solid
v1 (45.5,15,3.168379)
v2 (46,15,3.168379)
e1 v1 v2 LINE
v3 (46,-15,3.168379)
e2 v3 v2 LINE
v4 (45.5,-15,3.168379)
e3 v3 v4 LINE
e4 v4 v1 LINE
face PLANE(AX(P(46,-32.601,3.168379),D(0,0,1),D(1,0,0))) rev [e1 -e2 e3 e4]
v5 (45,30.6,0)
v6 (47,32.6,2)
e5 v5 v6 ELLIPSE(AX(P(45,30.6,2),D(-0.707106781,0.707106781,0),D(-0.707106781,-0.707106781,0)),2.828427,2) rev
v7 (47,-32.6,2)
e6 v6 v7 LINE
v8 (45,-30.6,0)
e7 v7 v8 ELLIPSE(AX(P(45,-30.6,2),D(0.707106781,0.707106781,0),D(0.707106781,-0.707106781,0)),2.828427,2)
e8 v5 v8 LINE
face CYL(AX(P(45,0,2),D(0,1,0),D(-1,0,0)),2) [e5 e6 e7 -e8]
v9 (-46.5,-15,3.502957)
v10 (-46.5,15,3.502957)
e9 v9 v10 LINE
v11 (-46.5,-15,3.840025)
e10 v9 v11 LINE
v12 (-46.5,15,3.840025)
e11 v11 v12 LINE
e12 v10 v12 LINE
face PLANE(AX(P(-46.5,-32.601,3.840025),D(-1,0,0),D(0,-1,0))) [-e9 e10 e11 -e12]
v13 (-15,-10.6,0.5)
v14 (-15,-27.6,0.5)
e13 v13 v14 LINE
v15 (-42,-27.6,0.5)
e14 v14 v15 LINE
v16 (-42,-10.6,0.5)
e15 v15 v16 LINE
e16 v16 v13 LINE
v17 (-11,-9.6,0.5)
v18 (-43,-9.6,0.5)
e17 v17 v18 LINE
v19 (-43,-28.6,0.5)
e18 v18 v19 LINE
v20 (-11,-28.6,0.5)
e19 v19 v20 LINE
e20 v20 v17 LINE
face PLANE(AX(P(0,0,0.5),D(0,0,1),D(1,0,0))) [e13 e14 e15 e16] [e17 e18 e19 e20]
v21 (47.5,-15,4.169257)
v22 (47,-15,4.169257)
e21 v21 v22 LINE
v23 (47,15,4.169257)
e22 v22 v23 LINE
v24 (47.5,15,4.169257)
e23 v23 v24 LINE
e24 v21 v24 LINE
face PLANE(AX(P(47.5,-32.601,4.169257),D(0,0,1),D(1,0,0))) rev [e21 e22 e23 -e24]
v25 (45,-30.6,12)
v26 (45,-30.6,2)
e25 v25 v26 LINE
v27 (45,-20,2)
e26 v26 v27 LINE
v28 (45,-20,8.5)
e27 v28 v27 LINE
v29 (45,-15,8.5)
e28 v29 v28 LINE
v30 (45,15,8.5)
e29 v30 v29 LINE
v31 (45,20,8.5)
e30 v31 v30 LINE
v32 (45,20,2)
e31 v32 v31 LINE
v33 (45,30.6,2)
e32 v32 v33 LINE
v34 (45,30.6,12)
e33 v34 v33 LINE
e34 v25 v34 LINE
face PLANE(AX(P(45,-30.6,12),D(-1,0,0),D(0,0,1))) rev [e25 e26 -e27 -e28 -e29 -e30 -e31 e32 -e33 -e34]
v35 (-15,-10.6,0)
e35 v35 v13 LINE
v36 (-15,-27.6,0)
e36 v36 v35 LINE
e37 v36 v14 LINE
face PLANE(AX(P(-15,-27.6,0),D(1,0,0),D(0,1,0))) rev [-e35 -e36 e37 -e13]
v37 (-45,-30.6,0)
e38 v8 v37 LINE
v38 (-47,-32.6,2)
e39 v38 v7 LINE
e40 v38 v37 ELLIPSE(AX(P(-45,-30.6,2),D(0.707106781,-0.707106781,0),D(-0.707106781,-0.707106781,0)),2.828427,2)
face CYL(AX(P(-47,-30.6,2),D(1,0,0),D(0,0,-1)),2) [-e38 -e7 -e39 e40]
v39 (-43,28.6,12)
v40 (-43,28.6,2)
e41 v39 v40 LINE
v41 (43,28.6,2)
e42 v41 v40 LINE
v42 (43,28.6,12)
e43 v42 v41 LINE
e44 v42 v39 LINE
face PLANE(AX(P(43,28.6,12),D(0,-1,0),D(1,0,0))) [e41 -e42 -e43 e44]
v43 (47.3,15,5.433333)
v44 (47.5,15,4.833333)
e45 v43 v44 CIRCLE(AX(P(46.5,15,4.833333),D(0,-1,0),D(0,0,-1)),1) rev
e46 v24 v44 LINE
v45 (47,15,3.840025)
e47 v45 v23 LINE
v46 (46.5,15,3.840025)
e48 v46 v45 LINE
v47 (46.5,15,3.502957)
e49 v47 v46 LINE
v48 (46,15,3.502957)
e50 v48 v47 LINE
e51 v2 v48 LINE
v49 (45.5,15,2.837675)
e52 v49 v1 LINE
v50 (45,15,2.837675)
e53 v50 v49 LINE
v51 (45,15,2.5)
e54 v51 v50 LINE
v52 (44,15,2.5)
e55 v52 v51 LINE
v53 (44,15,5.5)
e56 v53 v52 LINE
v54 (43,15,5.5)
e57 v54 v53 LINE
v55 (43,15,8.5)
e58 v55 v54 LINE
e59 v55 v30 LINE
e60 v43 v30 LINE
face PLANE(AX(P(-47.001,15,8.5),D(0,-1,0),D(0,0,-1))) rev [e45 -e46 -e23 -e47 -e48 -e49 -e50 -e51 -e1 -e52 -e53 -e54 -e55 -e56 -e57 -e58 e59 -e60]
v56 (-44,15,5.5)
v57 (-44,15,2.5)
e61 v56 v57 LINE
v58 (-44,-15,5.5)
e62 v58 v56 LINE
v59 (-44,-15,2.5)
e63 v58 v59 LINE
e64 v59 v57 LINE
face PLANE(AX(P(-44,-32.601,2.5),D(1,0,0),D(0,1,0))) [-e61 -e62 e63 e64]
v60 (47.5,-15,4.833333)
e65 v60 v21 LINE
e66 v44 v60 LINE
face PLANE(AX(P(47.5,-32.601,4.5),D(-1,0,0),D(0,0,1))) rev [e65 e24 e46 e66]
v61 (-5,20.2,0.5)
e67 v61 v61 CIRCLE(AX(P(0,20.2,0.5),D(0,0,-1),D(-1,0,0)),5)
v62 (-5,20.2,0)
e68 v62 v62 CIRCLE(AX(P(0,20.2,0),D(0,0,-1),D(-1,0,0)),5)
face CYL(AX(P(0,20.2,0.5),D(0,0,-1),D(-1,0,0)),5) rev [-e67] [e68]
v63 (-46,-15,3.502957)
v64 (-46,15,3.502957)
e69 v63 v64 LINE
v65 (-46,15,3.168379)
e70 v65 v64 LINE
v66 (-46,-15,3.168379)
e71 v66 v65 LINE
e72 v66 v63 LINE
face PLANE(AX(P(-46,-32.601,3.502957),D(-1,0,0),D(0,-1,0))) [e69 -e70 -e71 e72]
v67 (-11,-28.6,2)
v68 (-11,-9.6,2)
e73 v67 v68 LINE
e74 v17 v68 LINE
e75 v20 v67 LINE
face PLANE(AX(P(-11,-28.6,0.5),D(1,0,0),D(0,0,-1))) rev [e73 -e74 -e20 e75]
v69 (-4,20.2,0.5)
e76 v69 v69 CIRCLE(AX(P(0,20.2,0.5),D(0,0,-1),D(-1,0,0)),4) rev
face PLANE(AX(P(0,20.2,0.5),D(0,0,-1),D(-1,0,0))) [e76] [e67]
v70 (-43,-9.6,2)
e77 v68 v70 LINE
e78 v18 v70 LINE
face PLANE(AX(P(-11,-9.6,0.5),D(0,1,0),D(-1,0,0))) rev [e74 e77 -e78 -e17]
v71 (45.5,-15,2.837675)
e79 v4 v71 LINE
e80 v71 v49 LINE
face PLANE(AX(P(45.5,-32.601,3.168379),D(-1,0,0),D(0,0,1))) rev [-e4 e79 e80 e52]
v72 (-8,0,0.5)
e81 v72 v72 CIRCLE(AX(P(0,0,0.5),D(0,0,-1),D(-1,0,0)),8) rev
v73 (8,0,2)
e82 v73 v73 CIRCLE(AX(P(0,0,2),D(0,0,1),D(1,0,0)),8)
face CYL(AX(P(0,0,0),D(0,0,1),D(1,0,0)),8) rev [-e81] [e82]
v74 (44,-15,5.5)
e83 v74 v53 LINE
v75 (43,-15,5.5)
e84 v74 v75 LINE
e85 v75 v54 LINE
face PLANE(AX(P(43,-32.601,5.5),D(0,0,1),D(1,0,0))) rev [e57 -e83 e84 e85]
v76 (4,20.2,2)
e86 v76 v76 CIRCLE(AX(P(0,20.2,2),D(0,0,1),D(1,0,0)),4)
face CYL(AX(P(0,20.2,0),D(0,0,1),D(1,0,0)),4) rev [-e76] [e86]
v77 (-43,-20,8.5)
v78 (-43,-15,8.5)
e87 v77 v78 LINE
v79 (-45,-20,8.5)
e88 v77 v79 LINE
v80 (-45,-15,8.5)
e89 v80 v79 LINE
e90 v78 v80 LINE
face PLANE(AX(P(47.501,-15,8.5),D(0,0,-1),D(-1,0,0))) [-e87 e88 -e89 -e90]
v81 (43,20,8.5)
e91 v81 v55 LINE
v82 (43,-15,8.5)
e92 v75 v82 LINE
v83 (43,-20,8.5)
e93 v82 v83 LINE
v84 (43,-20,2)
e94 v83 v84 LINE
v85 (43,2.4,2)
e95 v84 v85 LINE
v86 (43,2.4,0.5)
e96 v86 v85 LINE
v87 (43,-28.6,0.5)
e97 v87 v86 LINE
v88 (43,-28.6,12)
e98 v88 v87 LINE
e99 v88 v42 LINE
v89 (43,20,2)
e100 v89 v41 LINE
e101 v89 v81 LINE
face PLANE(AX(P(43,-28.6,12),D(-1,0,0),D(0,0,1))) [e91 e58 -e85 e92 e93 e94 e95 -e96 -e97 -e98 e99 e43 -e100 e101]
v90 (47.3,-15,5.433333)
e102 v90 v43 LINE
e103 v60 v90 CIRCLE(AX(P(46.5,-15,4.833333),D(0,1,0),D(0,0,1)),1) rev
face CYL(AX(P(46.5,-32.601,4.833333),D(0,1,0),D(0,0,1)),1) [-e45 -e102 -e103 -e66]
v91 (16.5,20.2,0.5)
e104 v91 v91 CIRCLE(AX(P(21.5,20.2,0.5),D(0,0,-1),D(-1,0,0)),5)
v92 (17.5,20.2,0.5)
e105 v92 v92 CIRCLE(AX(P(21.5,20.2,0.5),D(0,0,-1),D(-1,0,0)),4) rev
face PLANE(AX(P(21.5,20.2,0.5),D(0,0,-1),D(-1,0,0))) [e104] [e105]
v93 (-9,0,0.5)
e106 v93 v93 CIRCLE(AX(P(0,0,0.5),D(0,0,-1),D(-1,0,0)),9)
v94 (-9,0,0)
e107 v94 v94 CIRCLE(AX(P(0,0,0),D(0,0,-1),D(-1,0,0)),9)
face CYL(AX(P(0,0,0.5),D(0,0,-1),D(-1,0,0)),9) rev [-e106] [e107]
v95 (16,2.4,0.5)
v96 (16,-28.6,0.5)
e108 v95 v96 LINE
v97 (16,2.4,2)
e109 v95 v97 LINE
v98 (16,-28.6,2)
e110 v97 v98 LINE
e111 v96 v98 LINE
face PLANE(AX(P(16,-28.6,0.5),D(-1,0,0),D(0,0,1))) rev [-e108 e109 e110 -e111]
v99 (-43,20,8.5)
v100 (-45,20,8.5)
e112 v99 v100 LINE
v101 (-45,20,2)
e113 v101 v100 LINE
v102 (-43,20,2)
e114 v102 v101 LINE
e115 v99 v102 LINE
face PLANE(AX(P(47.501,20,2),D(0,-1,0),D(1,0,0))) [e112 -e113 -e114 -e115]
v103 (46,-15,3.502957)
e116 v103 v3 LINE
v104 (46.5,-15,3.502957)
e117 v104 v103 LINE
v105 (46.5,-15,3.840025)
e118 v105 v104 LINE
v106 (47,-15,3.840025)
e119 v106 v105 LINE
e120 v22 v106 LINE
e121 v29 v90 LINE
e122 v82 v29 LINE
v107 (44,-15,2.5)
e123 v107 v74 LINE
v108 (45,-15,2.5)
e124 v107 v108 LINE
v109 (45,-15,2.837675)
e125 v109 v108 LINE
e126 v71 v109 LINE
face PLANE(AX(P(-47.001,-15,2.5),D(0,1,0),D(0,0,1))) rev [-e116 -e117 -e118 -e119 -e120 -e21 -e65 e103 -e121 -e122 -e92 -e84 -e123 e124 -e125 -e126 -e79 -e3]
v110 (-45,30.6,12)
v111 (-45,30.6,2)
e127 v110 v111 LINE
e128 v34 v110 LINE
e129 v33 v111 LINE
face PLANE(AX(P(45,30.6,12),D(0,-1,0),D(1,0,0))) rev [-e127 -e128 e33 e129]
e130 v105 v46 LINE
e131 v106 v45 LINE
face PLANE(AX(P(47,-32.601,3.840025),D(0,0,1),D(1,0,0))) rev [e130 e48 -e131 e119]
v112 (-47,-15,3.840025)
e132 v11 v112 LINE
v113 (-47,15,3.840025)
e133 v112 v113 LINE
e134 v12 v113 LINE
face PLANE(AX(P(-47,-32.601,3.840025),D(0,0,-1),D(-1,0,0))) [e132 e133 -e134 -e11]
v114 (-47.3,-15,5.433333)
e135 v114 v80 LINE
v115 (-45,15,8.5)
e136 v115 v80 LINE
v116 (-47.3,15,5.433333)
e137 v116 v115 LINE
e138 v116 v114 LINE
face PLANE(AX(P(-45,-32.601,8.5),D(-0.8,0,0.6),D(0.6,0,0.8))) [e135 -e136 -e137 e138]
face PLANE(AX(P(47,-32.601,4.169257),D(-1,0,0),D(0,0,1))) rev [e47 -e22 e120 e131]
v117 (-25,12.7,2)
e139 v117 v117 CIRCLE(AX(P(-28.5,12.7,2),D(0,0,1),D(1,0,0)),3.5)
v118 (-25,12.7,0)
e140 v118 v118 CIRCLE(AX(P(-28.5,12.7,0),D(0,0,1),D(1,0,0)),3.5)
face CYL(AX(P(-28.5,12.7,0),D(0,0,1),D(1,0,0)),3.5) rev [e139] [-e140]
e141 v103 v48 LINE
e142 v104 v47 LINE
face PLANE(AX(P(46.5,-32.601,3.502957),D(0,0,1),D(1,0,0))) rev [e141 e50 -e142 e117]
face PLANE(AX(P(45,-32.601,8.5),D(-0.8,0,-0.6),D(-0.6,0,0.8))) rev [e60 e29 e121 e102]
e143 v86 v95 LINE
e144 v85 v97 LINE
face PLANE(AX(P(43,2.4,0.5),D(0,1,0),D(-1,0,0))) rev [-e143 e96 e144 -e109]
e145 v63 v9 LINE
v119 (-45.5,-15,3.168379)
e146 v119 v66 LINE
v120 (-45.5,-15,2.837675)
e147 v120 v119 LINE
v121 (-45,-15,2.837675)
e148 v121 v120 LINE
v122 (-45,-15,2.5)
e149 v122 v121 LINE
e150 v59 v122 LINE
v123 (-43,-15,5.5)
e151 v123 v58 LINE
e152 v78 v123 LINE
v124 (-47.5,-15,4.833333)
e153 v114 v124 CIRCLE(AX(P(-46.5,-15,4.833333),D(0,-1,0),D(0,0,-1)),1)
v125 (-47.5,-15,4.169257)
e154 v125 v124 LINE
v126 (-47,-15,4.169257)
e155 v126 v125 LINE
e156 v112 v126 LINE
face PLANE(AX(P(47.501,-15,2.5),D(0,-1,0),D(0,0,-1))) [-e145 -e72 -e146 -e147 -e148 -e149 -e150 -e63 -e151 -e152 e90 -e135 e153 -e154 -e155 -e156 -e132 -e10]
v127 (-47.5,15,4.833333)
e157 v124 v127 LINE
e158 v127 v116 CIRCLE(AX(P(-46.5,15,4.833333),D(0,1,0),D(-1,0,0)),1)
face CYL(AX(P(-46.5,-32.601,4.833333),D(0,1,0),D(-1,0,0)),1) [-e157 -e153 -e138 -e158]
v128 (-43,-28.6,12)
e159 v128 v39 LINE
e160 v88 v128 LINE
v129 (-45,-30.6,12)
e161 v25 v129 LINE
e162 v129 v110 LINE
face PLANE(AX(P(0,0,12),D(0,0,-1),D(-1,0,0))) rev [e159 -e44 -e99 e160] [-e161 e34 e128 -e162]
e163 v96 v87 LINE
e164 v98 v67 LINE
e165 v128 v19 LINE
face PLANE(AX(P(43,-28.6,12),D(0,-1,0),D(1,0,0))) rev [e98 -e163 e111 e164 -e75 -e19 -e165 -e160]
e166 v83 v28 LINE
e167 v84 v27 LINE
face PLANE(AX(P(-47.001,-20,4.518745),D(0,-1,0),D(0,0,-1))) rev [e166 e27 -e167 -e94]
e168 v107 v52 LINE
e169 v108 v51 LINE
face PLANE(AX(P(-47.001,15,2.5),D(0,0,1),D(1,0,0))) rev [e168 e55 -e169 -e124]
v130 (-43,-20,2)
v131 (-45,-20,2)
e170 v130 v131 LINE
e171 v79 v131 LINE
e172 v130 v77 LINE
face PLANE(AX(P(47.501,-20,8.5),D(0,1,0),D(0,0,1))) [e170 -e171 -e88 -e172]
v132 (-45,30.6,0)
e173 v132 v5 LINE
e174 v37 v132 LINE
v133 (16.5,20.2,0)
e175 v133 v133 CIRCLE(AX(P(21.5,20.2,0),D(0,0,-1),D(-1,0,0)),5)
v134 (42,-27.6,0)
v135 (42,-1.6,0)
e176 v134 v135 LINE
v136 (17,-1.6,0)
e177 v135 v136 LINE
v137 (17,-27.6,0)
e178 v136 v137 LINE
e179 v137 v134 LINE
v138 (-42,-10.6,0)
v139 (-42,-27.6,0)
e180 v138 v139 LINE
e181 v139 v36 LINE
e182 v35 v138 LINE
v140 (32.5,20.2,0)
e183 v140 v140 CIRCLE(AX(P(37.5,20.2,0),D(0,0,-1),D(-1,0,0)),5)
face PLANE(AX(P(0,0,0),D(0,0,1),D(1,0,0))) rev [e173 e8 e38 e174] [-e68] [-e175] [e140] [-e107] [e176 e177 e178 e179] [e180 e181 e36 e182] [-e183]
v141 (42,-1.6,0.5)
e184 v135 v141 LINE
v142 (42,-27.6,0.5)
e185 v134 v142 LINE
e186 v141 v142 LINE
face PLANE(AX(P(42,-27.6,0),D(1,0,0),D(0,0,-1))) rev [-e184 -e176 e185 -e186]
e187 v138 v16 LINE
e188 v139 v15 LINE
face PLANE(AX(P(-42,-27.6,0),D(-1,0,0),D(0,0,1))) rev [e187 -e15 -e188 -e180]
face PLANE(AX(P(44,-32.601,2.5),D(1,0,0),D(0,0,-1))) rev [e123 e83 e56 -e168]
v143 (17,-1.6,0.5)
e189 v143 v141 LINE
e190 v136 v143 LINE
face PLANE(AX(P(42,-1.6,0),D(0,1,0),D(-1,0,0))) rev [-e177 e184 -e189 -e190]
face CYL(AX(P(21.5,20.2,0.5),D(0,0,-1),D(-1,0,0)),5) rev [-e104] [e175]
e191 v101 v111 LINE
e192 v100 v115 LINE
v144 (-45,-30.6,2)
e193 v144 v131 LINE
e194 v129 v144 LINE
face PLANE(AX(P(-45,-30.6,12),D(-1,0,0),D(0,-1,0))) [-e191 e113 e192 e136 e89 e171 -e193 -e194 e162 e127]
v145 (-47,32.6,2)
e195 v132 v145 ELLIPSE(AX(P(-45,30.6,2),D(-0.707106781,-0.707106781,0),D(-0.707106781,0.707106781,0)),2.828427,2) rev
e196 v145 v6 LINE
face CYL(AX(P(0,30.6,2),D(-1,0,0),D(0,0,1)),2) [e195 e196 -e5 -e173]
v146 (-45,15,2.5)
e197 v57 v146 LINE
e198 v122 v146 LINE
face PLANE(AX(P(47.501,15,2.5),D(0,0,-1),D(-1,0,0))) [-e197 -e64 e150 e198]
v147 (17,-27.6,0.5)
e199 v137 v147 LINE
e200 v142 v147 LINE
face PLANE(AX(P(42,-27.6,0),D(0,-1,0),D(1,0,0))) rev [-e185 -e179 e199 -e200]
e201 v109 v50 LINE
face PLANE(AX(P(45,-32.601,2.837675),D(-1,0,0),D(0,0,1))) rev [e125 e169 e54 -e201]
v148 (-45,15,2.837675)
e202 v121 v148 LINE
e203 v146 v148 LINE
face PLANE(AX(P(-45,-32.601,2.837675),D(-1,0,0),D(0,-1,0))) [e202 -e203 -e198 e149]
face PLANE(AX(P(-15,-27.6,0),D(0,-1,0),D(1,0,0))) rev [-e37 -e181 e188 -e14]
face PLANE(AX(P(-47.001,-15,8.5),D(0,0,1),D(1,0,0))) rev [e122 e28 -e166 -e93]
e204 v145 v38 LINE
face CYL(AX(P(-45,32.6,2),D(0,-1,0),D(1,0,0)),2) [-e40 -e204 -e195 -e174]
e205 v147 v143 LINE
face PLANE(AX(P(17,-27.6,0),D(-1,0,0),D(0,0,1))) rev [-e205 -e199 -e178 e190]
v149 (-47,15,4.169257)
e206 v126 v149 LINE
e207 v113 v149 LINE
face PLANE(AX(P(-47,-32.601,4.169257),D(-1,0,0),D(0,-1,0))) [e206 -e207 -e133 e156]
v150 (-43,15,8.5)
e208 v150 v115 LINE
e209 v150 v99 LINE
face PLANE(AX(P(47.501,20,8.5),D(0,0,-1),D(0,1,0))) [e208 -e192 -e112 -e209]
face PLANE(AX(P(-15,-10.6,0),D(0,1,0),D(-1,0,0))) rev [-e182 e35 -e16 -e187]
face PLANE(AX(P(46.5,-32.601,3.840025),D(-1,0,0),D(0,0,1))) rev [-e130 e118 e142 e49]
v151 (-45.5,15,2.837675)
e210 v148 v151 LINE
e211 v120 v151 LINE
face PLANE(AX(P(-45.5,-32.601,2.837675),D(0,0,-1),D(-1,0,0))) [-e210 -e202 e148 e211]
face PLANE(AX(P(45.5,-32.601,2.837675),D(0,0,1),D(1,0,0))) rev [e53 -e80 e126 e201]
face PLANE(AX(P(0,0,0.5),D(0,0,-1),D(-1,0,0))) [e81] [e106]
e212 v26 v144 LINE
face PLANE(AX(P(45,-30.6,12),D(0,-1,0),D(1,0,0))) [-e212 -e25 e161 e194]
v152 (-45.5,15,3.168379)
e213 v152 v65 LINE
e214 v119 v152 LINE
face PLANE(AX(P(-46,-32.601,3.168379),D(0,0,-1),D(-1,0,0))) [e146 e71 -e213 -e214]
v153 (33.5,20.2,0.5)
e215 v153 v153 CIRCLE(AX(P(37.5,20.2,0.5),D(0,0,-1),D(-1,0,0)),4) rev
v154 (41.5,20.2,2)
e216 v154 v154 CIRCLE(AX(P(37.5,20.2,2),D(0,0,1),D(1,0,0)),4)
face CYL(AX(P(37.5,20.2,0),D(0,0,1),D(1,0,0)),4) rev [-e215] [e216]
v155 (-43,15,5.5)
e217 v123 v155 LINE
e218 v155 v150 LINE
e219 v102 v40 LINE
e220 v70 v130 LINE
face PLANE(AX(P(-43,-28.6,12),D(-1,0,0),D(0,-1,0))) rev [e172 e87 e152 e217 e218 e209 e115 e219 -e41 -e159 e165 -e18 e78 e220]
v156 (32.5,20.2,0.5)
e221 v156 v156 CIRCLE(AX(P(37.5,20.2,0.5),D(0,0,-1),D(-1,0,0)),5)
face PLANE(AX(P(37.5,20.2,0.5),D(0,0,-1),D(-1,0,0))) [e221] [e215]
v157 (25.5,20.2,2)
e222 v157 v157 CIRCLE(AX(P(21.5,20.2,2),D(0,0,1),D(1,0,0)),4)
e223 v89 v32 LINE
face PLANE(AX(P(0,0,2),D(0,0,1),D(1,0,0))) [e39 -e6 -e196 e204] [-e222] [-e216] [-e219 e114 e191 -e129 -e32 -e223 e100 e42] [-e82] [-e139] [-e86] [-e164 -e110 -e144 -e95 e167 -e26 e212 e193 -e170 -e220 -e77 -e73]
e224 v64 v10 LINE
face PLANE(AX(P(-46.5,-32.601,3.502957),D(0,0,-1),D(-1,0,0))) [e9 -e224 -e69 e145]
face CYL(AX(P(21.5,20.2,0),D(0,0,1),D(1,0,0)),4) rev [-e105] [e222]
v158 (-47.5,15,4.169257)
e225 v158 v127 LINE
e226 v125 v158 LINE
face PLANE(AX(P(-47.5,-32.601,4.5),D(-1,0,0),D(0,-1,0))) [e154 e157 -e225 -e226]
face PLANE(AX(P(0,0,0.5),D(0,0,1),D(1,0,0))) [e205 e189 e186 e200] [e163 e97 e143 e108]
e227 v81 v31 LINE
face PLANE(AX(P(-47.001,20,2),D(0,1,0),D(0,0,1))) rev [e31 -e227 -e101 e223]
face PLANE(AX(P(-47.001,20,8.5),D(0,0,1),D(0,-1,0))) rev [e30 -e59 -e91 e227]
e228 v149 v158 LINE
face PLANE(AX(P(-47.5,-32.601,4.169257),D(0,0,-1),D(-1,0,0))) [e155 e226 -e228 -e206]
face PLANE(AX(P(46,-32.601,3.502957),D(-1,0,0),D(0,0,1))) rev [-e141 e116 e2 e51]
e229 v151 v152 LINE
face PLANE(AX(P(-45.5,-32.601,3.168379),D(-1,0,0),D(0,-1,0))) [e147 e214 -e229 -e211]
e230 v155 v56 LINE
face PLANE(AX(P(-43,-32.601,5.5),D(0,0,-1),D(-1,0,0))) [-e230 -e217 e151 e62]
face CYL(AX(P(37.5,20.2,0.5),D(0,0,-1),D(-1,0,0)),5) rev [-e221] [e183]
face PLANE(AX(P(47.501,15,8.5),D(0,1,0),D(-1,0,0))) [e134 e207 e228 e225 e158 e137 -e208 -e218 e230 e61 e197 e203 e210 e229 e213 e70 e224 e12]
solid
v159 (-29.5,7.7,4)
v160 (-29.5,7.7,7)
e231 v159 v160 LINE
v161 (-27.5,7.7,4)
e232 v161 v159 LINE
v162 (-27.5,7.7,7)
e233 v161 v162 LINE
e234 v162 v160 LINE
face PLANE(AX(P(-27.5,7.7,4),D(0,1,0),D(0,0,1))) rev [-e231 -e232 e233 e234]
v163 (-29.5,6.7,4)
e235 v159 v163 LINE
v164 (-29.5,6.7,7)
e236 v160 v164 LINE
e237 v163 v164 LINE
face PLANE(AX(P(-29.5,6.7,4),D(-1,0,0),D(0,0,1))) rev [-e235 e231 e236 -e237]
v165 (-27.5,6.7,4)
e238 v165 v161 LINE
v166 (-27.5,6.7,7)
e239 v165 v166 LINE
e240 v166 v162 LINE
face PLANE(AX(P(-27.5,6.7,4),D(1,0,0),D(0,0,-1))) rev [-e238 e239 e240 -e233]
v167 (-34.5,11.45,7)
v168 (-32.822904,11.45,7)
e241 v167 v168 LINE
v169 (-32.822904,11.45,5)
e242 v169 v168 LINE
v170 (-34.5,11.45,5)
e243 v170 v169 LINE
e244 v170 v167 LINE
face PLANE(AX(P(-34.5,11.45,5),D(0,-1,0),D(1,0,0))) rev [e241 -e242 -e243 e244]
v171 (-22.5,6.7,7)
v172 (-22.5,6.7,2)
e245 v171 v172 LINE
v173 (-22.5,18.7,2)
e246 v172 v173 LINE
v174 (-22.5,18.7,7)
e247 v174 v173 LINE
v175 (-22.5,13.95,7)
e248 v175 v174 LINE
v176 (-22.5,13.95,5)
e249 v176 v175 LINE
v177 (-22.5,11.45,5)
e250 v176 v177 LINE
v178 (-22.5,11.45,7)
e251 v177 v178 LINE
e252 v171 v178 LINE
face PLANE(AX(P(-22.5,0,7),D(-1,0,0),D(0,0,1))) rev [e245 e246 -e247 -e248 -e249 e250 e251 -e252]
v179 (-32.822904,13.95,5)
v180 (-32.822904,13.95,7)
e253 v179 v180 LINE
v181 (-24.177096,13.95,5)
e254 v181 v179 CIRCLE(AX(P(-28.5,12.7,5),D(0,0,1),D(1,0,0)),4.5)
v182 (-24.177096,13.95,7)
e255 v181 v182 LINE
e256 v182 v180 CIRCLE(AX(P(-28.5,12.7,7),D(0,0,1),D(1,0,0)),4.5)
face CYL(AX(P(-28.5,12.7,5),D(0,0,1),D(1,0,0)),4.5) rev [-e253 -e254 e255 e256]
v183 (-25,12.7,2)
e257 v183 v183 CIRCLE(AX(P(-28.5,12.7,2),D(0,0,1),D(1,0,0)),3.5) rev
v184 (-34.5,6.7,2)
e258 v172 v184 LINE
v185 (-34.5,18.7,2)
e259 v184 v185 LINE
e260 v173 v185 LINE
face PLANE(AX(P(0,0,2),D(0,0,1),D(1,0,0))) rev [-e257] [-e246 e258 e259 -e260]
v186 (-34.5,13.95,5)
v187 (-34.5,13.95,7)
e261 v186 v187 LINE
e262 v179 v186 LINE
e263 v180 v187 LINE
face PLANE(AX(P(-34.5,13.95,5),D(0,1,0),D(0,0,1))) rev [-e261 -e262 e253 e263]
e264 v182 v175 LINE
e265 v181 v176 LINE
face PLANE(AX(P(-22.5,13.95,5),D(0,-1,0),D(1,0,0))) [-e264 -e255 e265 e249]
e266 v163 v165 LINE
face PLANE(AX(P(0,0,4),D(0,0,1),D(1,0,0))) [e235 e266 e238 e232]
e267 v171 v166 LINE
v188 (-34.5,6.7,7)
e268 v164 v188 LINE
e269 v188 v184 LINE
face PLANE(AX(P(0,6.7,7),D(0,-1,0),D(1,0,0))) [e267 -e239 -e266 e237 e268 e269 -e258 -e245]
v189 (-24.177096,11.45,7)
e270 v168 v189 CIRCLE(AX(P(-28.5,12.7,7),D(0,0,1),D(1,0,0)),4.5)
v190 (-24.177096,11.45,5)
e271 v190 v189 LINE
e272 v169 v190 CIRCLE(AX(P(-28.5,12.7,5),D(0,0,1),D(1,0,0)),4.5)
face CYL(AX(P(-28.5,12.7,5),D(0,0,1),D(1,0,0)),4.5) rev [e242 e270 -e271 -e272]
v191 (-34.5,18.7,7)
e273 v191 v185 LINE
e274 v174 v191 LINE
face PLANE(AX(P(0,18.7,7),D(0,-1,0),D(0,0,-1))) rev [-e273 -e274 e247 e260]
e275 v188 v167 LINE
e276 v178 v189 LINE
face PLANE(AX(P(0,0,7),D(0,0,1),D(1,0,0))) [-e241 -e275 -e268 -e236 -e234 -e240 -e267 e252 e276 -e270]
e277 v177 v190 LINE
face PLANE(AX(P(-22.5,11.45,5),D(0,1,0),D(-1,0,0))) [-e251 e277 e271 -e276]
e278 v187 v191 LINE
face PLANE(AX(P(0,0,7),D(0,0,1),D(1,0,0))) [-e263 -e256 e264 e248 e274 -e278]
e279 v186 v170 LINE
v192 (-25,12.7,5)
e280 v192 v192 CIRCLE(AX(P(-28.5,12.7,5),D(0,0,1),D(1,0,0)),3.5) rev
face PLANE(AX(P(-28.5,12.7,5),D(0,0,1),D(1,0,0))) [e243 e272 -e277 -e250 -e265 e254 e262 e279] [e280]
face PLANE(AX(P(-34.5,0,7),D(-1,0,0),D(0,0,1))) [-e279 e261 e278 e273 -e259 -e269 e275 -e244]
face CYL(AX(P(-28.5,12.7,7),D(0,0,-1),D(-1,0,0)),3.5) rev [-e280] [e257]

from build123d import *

# Parameters (mm, degrees)
SKETCH_1_W             = 94
SKETCH_1_H             = 65.2
EXTRUDE_1_DEPTH        = 2
SKETCH_2_R             = 8
SKETCH_2_R_2           = 3.5
SKETCH_2_R_3           = 4
SKETCH_2_W             = 27
SKETCH_2_H             = 17
SKETCH_2_W_2           = 25
SKETCH_2_H_2           = 26
CUT_EXTRUDE_1_DEPTH    = 2
SKETCH_3_W             = 90
SKETCH_3_H             = 61.2
SKETCH_3_W_2           = 86
SKETCH_3_H_2           = 57.2
EXTRUDE_2_DEPTH        = 10
SKETCH_4_R             = 9
SKETCH_4_R_2           = 5
CUT_EXTRUDE_4_DEPTH    = 0.5
SKETCH_5_W             = 27
SKETCH_5_H             = 31
SKETCH_5_W_2           = 32
SKETCH_5_H_2           = 19
CUT_EXTRUDE_5_DEPTH    = 1.5
SKETCH_6_W             = 12
SKETCH_6_H             = 12
SKETCH_6_R             = 3.5
EXTRUDE_4_DEPTH        = 5
SKETCH_7_W             = 2
SKETCH_7_H             = 1
CUT_EXTRUDE_6_DEPTH    = 3
CUT_EXTRUDE_7_DEPTH    = 2
SKETCH_10_W            = 6
SKETCH_10_H            = 30
EXTRUDE_5_DEPTH        = 3
CUT_EXTRUDE_9_DEPTH    = 30
CUT_EXTRUDE_10_DEPTH   = 30
CUT_EXTRUDE_11_DEPTH   = 30
FILLET_1_R             = 1
FILLET_2_R             = 2
FILLET_1_OF_MIRROR_9_R = 1
SKETCH_17_R            = 4.5
CUT_EXTRUDE_13_DEPTH   = 2
SKETCH_18_W            = 1.677095884
SKETCH_18_H            = 2.5
CUT_EXTRUDE_14_DEPTH   = 2
SKETCH_19_W            = 1
SKETCH_19_H            = 3
CUT_EXTRUDE_15_DEPTH   = 30


with BuildPart() as part:
    # 草图1 → 凸台-拉伸1 (new body)
    with BuildSketch(Plane.XY):
        Rectangle(SKETCH_1_W, SKETCH_1_H)
    extrude(amount=EXTRUDE_1_DEPTH)

    # 草图2 → 切除-拉伸1 (cut)
    with BuildSketch(Plane.XY.offset(2)):
        Circle(SKETCH_2_R)
        with Locations((-28.5, 12.7)):
            Circle(SKETCH_2_R_2)
        with Locations((37.5, 20.2)):
            Circle(SKETCH_2_R_3)
        with Locations((21.5, 20.2)):
            Circle(SKETCH_2_R_3)
        with Locations((0, 20.2)):
            Circle(SKETCH_2_R_3)
        with Locations((-28.5, -19.1)):
            Rectangle(SKETCH_2_W, SKETCH_2_H)
        with Locations((29.5, -14.6)):
            Rectangle(SKETCH_2_W_2, SKETCH_2_H_2)
    extrude(amount=-CUT_EXTRUDE_1_DEPTH, mode=Mode.SUBTRACT)

    # 草图3 → 凸台-拉伸2 (add)
    with BuildSketch(Plane.XY.offset(2)):
        Rectangle(SKETCH_3_W, SKETCH_3_H)
        Rectangle(SKETCH_3_W_2, SKETCH_3_H_2, mode=Mode.SUBTRACT)
    extrude(amount=EXTRUDE_2_DEPTH)

    # 草图4 → 切除-拉伸4 (cut)
    with BuildSketch(Plane(origin=(0, 0, 0), x_dir=(-1, 0, 0), z_dir=(0, 0, -1))):
        Circle(SKETCH_4_R)
        with Locations((0, 20.2)):
            Circle(SKETCH_4_R_2)
        with Locations((-21.5, 20.2)):
            Circle(SKETCH_4_R_2)
        with Locations((-37.5, 20.2)):
            Circle(SKETCH_4_R_2)
    extrude(amount=-CUT_EXTRUDE_4_DEPTH, mode=Mode.SUBTRACT)

    # 草图5 → 切除-拉伸5 (cut)
    with BuildSketch(Plane.XY.offset(2)):
        with Locations((29.5, -13.1)):
            Rectangle(SKETCH_5_W, SKETCH_5_H)
        with Locations((-27, -19.1)):
            Rectangle(SKETCH_5_W_2, SKETCH_5_H_2)
    extrude(amount=-CUT_EXTRUDE_5_DEPTH, mode=Mode.SUBTRACT)

    # 草图9 → 切除-拉伸7 (cut)
    with BuildSketch(Plane(origin=(45, 0, 0), x_dir=(0, 0, -1), z_dir=(1, 0, 0))):
        Polygon((-8.5, 20), (-8.5, 15), (-2.5, 15), (-2.5, -15), (-8.5, -15), (-8.5, -20), (-4.518745162, -20), (-2, -20), (-2, 20), align=None)
    cut_extrude_7 = extrude(amount=-CUT_EXTRUDE_7_DEPTH, mode=Mode.SUBTRACT)

    # 草图10 → 凸台-拉伸5 (add)
    with BuildSketch(Plane(origin=(45, 0, 0), x_dir=(0, 0, -1), z_dir=(1, 0, 0))):
        with Locations((-5.5, 0)):
            Rectangle(SKETCH_10_W, SKETCH_10_H)
    extrude_5 = extrude(amount=EXTRUDE_5_DEPTH)

    # 草图13 → 切除-拉伸9 (cut)
    with BuildSketch(Plane(origin=(0, 15, 0), x_dir=(1, 0, 0), z_dir=(0, 1, 0))):
        Polygon((48, -4.5), (48, -2.5), (45, -2.5), (45, -2.837675063), (45.5, -2.837675063), (45.5, -3.168378765), (46, -3.168378765), (46, -3.502957406), (46.5, -3.502957406), (46.5, -3.840024676), (47, -3.840024676), (47, -4.169256843), (47.5, -4.169256843), (47.5, -4.5), align=None)
    cut_extrude_9 = extrude(amount=-CUT_EXTRUDE_9_DEPTH, mode=Mode.SUBTRACT)

    # 草图14 → 切除-拉伸10 (cut)
    with BuildSketch(Plane(origin=(0, 15, 0), x_dir=(1, 0, 0), z_dir=(0, 1, 0))):
        Polygon((45, -8.5), (48, -4.5), (48, -8.5), align=None)
    cut_extrude_10 = extrude(amount=-CUT_EXTRUDE_10_DEPTH, mode=Mode.SUBTRACT)

    # 草图15 → 切除-拉伸11 (cut)
    with BuildSketch(Plane(origin=(0, 15, 0), x_dir=(1, 0, 0), z_dir=(0, 1, 0))):
        Polygon((47.5, -4.5), (47.5, -5.166666667), (48, -4.5), align=None)
    cut_extrude_11 = extrude(amount=-CUT_EXTRUDE_11_DEPTH, mode=Mode.SUBTRACT)

    # 圆角1
    fillet_1_edges = [part.edges().sort_by_distance(p)[0] for p in [
        (47.5, 0, 5.166666667),
    ]]
    fillet(fillet_1_edges, radius=FILLET_1_R)

    # 圆角2
    fillet_2_edges = [part.edges().sort_by_distance(p)[0] for p in [
        (47, 0, 0),
        (0, -32.6, 0),
        (-47, 0, 0),
        (0, 32.6, 0),
    ]]
    fillet(fillet_2_edges, radius=FILLET_2_R - 0.0001)  # a hair under: the kernel refuses the full size

    # 镜向9: 切除-拉伸7, 凸台-拉伸5, 切除-拉伸9, 切除-拉伸10, 切除-拉伸11 across plane
    add(cut_extrude_7.mirror(Plane(origin=(0, 0, 0), x_dir=(0, 0, 1), z_dir=(1, 0, 0))), mode=Mode.SUBTRACT)
    add(extrude_5.mirror(Plane(origin=(0, 0, 0), x_dir=(0, 0, 1), z_dir=(1, 0, 0))))
    add(cut_extrude_9.mirror(Plane(origin=(0, 0, 0), x_dir=(0, 0, 1), z_dir=(1, 0, 0))), mode=Mode.SUBTRACT)
    add(cut_extrude_10.mirror(Plane(origin=(0, 0, 0), x_dir=(0, 0, 1), z_dir=(1, 0, 0))), mode=Mode.SUBTRACT)
    add(cut_extrude_11.mirror(Plane(origin=(0, 0, 0), x_dir=(0, 0, 1), z_dir=(1, 0, 0))), mode=Mode.SUBTRACT)

    # 圆角1 of 镜向9
    fillet_1_of_mirror_9_edges = [part.edges().sort_by_distance(p)[0] for p in [
        (-47.5, 0, 5.166666667),
    ]]
    fillet(fillet_1_of_mirror_9_edges, radius=FILLET_1_OF_MIRROR_9_R)

    # 草图19 → 切除-拉伸15 (cut)
    with BuildSketch(Plane(origin=(0, 15, 0), x_dir=(1, 0, 0), z_dir=(0, 1, 0))):
        with Locations((43.5, -4)):
            Rectangle(SKETCH_19_W, SKETCH_19_H)
    cut_extrude_15 = extrude(amount=-CUT_EXTRUDE_15_DEPTH, mode=Mode.SUBTRACT)

    # 镜向11: 切除-拉伸15 across plane
    add(cut_extrude_15.mirror(Plane(origin=(0, 0, 0), x_dir=(0, 0, 1), z_dir=(1, 0, 0))), mode=Mode.SUBTRACT)


with BuildPart() as body_2:
    # 草图6 → 凸台-拉伸4 (new body)
    with BuildSketch(Plane.XY.offset(2)):
        with Locations((-28.5, 12.7)):
            Rectangle(SKETCH_6_W, SKETCH_6_H)
        with Locations((-28.5, 12.7)):
            Circle(SKETCH_6_R, mode=Mode.SUBTRACT)
    extrude(amount=EXTRUDE_4_DEPTH)

    # 草图7 → 切除-拉伸6 (cut)
    with BuildSketch(Plane.XY.offset(7)):
        with Locations((-28.5, 7.2)):
            Rectangle(SKETCH_7_W, SKETCH_7_H)
    extrude(amount=-CUT_EXTRUDE_6_DEPTH, mode=Mode.SUBTRACT)

    # 草图17 → 切除-拉伸13 (cut)
    with BuildSketch(Plane.XY.offset(7)):
        with Locations((-28.5, 12.7)):
            Circle(SKETCH_17_R)
    extrude(amount=-CUT_EXTRUDE_13_DEPTH, mode=Mode.SUBTRACT)

    # 草图18 → 切除-拉伸14 (cut)
    with BuildSketch(Plane.XY.offset(7)):
        with Locations((-33.661452058, 12.7)):
            Rectangle(SKETCH_18_W, SKETCH_18_H)
    cut_extrude_14 = extrude(amount=-CUT_EXTRUDE_14_DEPTH, mode=Mode.SUBTRACT)

    # 镜向10: 切除-拉伸14 across plane
    add(cut_extrude_14.mirror(Plane(origin=(-28.5, 0, 0), x_dir=(0, 0, 1), z_dir=(1, 0, 0))), mode=Mode.SUBTRACT)


solid = Compound([part.part, body_2.part])
